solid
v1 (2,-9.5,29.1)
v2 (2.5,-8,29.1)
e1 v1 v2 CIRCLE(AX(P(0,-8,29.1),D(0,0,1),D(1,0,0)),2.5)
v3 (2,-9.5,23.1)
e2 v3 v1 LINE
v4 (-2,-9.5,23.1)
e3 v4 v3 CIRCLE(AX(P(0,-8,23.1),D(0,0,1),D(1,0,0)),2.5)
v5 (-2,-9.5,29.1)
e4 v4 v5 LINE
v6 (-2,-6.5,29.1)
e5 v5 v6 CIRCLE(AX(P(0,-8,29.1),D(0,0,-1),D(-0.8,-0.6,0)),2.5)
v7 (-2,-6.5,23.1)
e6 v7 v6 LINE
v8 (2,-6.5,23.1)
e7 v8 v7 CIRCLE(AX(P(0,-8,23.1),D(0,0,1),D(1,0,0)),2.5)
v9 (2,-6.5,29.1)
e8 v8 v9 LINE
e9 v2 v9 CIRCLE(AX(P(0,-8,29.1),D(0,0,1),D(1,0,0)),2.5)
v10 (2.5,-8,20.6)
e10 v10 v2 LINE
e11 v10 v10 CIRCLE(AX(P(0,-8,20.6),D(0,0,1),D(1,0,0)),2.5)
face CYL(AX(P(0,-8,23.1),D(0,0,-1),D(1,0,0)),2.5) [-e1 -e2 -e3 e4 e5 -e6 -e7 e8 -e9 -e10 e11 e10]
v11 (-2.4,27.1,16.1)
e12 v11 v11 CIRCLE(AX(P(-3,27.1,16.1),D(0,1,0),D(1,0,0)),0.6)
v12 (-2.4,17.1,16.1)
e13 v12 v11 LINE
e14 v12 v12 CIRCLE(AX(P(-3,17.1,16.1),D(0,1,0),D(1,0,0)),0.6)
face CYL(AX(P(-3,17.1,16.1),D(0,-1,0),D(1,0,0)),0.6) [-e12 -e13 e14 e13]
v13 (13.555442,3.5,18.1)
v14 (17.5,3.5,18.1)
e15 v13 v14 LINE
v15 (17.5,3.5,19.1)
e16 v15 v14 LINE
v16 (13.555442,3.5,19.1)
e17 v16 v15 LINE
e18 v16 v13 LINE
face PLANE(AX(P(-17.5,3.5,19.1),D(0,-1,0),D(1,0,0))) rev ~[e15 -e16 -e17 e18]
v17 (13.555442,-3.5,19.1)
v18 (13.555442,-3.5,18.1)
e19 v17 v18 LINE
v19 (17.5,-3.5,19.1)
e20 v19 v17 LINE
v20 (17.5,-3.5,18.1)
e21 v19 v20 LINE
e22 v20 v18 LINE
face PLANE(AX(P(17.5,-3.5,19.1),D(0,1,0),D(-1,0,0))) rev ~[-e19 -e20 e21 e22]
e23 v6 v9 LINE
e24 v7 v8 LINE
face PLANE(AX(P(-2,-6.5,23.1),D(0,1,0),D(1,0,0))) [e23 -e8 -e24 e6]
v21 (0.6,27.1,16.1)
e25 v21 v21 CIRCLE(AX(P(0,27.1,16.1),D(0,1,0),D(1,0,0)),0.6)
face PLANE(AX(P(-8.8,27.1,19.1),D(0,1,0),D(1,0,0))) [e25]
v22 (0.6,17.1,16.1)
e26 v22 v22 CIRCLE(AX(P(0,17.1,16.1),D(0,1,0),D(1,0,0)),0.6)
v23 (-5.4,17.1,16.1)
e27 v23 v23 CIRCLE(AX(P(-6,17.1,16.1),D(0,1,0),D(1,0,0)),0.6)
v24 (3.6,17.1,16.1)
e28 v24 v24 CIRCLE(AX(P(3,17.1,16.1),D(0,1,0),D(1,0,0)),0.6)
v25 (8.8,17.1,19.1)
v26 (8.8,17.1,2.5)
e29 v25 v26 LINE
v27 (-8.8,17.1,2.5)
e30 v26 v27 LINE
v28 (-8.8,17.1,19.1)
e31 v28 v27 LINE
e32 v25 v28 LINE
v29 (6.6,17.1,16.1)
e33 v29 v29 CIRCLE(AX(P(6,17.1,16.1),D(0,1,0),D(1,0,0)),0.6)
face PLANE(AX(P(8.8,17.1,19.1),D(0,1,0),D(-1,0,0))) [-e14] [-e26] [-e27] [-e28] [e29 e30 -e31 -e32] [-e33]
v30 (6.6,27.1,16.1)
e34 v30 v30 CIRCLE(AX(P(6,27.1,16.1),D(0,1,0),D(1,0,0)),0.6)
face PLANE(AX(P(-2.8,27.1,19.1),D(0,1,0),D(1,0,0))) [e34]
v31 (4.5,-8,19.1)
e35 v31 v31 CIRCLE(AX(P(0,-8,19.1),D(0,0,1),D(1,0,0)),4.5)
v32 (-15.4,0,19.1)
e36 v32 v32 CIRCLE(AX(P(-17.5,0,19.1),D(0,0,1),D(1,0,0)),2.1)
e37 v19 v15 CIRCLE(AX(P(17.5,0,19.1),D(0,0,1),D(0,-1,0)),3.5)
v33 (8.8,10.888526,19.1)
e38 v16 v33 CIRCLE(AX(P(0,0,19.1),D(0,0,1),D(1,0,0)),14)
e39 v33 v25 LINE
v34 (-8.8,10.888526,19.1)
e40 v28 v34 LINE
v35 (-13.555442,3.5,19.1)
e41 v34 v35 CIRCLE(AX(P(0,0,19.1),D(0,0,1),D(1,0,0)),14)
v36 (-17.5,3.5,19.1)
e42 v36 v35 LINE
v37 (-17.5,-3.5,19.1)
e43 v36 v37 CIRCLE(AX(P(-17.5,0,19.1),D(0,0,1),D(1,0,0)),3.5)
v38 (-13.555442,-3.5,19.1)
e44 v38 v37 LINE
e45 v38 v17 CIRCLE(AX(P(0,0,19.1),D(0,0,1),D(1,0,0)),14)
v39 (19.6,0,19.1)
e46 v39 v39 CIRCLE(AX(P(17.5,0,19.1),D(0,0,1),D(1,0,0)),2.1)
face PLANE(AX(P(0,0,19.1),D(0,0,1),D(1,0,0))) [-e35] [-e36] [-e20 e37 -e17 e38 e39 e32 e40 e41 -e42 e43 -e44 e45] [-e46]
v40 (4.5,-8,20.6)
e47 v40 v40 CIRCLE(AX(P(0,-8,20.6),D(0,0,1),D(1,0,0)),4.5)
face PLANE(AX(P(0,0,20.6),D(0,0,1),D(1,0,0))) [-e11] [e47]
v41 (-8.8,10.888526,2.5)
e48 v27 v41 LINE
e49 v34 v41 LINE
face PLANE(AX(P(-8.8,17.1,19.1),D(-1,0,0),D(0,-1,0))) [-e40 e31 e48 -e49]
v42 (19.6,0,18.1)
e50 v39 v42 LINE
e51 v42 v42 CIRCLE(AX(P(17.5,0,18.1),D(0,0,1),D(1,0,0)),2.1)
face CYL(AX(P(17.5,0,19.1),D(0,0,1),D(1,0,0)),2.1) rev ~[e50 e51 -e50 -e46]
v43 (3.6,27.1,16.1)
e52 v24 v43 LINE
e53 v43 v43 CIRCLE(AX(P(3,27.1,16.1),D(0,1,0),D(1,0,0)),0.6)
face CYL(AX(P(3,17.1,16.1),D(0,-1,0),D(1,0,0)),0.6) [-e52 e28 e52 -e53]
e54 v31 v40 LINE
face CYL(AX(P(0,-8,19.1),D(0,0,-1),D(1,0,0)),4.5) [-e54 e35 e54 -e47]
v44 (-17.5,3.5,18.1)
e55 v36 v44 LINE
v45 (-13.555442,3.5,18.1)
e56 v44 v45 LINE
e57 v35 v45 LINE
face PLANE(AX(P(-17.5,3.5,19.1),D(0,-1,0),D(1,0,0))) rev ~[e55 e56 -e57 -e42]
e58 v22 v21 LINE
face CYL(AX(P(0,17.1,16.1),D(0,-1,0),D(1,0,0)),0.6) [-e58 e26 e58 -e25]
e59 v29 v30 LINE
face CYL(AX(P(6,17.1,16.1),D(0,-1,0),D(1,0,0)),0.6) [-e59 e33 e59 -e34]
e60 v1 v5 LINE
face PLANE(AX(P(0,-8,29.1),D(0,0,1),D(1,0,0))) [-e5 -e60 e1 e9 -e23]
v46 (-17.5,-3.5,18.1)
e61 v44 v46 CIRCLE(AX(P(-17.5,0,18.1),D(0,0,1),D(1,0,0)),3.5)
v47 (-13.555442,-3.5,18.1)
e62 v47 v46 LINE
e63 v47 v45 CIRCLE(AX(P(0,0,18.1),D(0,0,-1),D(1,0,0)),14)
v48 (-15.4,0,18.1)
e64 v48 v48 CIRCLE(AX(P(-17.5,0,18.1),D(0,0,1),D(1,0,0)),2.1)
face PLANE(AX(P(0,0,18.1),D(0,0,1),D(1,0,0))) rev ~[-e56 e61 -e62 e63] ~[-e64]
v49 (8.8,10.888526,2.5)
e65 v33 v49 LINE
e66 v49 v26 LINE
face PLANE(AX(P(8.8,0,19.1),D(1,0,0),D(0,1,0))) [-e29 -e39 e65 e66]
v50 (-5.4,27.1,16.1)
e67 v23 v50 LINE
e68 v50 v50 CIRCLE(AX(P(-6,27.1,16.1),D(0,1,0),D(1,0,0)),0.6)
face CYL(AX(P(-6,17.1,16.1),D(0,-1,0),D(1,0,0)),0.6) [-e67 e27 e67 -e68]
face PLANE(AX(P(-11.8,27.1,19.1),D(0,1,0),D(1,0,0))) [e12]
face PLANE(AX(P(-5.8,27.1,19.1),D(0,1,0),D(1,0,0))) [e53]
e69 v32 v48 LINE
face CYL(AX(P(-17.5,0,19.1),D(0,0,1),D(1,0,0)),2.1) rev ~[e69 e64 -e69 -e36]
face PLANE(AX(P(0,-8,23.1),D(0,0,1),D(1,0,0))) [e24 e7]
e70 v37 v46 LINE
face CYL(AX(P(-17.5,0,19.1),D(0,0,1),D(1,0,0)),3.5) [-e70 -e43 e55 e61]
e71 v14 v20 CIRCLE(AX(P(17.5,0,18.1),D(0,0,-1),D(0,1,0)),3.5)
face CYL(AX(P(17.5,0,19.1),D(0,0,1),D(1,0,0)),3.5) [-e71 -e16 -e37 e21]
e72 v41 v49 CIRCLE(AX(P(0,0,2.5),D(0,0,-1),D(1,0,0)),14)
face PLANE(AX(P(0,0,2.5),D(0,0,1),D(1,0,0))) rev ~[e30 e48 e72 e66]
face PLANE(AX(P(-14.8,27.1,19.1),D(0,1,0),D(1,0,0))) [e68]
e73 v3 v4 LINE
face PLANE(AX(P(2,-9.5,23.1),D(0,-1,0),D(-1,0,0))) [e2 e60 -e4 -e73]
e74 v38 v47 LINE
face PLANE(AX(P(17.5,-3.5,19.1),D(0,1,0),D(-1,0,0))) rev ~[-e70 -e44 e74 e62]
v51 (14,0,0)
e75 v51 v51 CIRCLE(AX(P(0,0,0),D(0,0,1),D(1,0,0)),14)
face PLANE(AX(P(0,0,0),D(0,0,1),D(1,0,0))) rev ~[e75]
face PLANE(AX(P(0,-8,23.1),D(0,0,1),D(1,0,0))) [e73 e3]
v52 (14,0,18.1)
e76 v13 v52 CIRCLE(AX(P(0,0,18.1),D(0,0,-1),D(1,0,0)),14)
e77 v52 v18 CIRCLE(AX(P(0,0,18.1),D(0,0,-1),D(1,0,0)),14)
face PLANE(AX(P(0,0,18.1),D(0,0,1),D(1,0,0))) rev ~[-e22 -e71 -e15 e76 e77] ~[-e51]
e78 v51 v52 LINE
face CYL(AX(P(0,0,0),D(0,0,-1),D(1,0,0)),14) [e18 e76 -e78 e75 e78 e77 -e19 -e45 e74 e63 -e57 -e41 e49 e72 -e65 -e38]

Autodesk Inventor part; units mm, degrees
ref_plane "YZ Plane" through (0, 0, 0) normal (1, 0, 0) x (0, 1, 0)
ref_plane "XZ Plane" through (0, 0, 0) normal (0, 1, 0) x (-1, 0, 0)
ref_plane "XY Plane" through (0, 0, 0) normal (0, 0, 1) x (1, 0, 0)
sketch "スケッチ2" plane through (0, 0, 0) normal (0, 0, 1) x (1, 0, 0)
  circle A0 centre (0, 0) radius 14
  dimension "d0" = 28
extrude "本体" add sketch "スケッチ2" along normal blind 19.1
sketch "スケッチ3" plane through (0, 0, 19.1) normal (0, 0, 1) x (1, 0, 0)
  line L0 (0, 16.0197) -> (0, -16.0197) construction
  line L1 (-23.6697, 0) -> (23.6697, 0) construction
  circle A0 centre (-17.5, 0) radius 2.1
  circle A1 centre (17.5, 0) radius 2.1
  circle A2 centre (-17.5, 0) radius 3.5
  circle A3 centre (17.5, 0) radius 3.5
  line L2 (-17.5, 3.5) -> (17.5, 3.5)
  line L3 (17.5, -3.5) -> (-17.5, -3.5)
  point P0 (0, 0)
  point P1 (0, 0)
  dimension "d3" = 4.2
  dimension "d4" = 35
  dimension "d5" = 7
extrude "タブ" add sketch "スケッチ3" against normal blind 1
sketch "スケッチ4" plane through (0, 0, 19.1) normal (0, 0, 1) x (1, 0, 0)
  circle A0 centre (0, -8) radius 4.5
  point P0 (0, 0)
  dimension "d8" = 9
  dimension "d9" = 8
extrude "押し出し3" add sketch "スケッチ4" along normal blind 1.5
sketch "スケッチ5" plane through (0, -8, 20.6) normal (0, 0, 1) x (1, 0, 0)
  circle A0 centre (0, 0) radius 2.5
  circle A1 centre (0, 0) radius 4.5 projected
  point P0 (0, 8)
  dimension "d12" = 5
extrude "押し出し4" add sketch "スケッチ5" along normal blind 2.5 contours A0
sketch "スケッチ6" plane through (0, -8, 23.1) normal (0, 0, 1) x (1, 0, 0)
  circle A0 centre (0, 0) radius 2.5
  circle A1 centre (0, 0) radius 2.5 projected
  line L0 (-2.5, 1.5) -> (2.5, 1.5)
  line L1 (2.5, 1.5) -> (2.5, -1.5)
  line L2 (2.5, -1.5) -> (-2.5, -1.5)
  line L3 (-2.5, -1.5) -> (-2.5, 1.5)
  point P0 (0, 8)
  point P1 (2.5, 0)
  point P2 (0, 1.5)
  point P3 (-2, -1.5)
  point P4 (2, -1.5)
  point P5 (2, 1.5)
  point P6 (-2, 1.5)
  dimension "d15" = 3
extrude "押し出し5" add sketch "スケッチ6" along normal blind 6 contours A0 L2 L0
sketch "スケッチ7" plane through (0, 0, 19.1) normal (0, 0, 1) x (1, 0, 0)
  line L0 (-8.8, 0) -> (8.8, 0)
  line L1 (8.8, 0) -> (8.8, 17.1)
  line L2 (8.8, 17.1) -> (-8.8, 17.1)
  line L3 (-8.8, 17.1) -> (-8.8, 0)
  point P0 (0, 0)
  point P1 (0, 0)
  dimension "d18" = 17.6
  dimension "d19" = 17.1
extrude "押し出し6" add sketch "スケッチ7" against normal blind 16.6
sketch "スケッチ8" plane through (-8.8, 17.1, 19.1) normal (0, 1, 0) x (1, 0, 0)
  circle A0 centre (8.8, 3) radius 0.6
  line L0 (17.6, 0) -> (0, 0) projected
  point P0 (8.8, 19.1)
  dimension "d22" = 1.2
  dimension "d23" = 3
extrude "押し出し7" add sketch "スケッチ8" along normal blind 10
pattern_linear "矩形状パターン1" count 5 spacing 3 along (-1, 0, 0) of "押し出し7" first direction both ways yes
properties part number "28BYJ-48"
